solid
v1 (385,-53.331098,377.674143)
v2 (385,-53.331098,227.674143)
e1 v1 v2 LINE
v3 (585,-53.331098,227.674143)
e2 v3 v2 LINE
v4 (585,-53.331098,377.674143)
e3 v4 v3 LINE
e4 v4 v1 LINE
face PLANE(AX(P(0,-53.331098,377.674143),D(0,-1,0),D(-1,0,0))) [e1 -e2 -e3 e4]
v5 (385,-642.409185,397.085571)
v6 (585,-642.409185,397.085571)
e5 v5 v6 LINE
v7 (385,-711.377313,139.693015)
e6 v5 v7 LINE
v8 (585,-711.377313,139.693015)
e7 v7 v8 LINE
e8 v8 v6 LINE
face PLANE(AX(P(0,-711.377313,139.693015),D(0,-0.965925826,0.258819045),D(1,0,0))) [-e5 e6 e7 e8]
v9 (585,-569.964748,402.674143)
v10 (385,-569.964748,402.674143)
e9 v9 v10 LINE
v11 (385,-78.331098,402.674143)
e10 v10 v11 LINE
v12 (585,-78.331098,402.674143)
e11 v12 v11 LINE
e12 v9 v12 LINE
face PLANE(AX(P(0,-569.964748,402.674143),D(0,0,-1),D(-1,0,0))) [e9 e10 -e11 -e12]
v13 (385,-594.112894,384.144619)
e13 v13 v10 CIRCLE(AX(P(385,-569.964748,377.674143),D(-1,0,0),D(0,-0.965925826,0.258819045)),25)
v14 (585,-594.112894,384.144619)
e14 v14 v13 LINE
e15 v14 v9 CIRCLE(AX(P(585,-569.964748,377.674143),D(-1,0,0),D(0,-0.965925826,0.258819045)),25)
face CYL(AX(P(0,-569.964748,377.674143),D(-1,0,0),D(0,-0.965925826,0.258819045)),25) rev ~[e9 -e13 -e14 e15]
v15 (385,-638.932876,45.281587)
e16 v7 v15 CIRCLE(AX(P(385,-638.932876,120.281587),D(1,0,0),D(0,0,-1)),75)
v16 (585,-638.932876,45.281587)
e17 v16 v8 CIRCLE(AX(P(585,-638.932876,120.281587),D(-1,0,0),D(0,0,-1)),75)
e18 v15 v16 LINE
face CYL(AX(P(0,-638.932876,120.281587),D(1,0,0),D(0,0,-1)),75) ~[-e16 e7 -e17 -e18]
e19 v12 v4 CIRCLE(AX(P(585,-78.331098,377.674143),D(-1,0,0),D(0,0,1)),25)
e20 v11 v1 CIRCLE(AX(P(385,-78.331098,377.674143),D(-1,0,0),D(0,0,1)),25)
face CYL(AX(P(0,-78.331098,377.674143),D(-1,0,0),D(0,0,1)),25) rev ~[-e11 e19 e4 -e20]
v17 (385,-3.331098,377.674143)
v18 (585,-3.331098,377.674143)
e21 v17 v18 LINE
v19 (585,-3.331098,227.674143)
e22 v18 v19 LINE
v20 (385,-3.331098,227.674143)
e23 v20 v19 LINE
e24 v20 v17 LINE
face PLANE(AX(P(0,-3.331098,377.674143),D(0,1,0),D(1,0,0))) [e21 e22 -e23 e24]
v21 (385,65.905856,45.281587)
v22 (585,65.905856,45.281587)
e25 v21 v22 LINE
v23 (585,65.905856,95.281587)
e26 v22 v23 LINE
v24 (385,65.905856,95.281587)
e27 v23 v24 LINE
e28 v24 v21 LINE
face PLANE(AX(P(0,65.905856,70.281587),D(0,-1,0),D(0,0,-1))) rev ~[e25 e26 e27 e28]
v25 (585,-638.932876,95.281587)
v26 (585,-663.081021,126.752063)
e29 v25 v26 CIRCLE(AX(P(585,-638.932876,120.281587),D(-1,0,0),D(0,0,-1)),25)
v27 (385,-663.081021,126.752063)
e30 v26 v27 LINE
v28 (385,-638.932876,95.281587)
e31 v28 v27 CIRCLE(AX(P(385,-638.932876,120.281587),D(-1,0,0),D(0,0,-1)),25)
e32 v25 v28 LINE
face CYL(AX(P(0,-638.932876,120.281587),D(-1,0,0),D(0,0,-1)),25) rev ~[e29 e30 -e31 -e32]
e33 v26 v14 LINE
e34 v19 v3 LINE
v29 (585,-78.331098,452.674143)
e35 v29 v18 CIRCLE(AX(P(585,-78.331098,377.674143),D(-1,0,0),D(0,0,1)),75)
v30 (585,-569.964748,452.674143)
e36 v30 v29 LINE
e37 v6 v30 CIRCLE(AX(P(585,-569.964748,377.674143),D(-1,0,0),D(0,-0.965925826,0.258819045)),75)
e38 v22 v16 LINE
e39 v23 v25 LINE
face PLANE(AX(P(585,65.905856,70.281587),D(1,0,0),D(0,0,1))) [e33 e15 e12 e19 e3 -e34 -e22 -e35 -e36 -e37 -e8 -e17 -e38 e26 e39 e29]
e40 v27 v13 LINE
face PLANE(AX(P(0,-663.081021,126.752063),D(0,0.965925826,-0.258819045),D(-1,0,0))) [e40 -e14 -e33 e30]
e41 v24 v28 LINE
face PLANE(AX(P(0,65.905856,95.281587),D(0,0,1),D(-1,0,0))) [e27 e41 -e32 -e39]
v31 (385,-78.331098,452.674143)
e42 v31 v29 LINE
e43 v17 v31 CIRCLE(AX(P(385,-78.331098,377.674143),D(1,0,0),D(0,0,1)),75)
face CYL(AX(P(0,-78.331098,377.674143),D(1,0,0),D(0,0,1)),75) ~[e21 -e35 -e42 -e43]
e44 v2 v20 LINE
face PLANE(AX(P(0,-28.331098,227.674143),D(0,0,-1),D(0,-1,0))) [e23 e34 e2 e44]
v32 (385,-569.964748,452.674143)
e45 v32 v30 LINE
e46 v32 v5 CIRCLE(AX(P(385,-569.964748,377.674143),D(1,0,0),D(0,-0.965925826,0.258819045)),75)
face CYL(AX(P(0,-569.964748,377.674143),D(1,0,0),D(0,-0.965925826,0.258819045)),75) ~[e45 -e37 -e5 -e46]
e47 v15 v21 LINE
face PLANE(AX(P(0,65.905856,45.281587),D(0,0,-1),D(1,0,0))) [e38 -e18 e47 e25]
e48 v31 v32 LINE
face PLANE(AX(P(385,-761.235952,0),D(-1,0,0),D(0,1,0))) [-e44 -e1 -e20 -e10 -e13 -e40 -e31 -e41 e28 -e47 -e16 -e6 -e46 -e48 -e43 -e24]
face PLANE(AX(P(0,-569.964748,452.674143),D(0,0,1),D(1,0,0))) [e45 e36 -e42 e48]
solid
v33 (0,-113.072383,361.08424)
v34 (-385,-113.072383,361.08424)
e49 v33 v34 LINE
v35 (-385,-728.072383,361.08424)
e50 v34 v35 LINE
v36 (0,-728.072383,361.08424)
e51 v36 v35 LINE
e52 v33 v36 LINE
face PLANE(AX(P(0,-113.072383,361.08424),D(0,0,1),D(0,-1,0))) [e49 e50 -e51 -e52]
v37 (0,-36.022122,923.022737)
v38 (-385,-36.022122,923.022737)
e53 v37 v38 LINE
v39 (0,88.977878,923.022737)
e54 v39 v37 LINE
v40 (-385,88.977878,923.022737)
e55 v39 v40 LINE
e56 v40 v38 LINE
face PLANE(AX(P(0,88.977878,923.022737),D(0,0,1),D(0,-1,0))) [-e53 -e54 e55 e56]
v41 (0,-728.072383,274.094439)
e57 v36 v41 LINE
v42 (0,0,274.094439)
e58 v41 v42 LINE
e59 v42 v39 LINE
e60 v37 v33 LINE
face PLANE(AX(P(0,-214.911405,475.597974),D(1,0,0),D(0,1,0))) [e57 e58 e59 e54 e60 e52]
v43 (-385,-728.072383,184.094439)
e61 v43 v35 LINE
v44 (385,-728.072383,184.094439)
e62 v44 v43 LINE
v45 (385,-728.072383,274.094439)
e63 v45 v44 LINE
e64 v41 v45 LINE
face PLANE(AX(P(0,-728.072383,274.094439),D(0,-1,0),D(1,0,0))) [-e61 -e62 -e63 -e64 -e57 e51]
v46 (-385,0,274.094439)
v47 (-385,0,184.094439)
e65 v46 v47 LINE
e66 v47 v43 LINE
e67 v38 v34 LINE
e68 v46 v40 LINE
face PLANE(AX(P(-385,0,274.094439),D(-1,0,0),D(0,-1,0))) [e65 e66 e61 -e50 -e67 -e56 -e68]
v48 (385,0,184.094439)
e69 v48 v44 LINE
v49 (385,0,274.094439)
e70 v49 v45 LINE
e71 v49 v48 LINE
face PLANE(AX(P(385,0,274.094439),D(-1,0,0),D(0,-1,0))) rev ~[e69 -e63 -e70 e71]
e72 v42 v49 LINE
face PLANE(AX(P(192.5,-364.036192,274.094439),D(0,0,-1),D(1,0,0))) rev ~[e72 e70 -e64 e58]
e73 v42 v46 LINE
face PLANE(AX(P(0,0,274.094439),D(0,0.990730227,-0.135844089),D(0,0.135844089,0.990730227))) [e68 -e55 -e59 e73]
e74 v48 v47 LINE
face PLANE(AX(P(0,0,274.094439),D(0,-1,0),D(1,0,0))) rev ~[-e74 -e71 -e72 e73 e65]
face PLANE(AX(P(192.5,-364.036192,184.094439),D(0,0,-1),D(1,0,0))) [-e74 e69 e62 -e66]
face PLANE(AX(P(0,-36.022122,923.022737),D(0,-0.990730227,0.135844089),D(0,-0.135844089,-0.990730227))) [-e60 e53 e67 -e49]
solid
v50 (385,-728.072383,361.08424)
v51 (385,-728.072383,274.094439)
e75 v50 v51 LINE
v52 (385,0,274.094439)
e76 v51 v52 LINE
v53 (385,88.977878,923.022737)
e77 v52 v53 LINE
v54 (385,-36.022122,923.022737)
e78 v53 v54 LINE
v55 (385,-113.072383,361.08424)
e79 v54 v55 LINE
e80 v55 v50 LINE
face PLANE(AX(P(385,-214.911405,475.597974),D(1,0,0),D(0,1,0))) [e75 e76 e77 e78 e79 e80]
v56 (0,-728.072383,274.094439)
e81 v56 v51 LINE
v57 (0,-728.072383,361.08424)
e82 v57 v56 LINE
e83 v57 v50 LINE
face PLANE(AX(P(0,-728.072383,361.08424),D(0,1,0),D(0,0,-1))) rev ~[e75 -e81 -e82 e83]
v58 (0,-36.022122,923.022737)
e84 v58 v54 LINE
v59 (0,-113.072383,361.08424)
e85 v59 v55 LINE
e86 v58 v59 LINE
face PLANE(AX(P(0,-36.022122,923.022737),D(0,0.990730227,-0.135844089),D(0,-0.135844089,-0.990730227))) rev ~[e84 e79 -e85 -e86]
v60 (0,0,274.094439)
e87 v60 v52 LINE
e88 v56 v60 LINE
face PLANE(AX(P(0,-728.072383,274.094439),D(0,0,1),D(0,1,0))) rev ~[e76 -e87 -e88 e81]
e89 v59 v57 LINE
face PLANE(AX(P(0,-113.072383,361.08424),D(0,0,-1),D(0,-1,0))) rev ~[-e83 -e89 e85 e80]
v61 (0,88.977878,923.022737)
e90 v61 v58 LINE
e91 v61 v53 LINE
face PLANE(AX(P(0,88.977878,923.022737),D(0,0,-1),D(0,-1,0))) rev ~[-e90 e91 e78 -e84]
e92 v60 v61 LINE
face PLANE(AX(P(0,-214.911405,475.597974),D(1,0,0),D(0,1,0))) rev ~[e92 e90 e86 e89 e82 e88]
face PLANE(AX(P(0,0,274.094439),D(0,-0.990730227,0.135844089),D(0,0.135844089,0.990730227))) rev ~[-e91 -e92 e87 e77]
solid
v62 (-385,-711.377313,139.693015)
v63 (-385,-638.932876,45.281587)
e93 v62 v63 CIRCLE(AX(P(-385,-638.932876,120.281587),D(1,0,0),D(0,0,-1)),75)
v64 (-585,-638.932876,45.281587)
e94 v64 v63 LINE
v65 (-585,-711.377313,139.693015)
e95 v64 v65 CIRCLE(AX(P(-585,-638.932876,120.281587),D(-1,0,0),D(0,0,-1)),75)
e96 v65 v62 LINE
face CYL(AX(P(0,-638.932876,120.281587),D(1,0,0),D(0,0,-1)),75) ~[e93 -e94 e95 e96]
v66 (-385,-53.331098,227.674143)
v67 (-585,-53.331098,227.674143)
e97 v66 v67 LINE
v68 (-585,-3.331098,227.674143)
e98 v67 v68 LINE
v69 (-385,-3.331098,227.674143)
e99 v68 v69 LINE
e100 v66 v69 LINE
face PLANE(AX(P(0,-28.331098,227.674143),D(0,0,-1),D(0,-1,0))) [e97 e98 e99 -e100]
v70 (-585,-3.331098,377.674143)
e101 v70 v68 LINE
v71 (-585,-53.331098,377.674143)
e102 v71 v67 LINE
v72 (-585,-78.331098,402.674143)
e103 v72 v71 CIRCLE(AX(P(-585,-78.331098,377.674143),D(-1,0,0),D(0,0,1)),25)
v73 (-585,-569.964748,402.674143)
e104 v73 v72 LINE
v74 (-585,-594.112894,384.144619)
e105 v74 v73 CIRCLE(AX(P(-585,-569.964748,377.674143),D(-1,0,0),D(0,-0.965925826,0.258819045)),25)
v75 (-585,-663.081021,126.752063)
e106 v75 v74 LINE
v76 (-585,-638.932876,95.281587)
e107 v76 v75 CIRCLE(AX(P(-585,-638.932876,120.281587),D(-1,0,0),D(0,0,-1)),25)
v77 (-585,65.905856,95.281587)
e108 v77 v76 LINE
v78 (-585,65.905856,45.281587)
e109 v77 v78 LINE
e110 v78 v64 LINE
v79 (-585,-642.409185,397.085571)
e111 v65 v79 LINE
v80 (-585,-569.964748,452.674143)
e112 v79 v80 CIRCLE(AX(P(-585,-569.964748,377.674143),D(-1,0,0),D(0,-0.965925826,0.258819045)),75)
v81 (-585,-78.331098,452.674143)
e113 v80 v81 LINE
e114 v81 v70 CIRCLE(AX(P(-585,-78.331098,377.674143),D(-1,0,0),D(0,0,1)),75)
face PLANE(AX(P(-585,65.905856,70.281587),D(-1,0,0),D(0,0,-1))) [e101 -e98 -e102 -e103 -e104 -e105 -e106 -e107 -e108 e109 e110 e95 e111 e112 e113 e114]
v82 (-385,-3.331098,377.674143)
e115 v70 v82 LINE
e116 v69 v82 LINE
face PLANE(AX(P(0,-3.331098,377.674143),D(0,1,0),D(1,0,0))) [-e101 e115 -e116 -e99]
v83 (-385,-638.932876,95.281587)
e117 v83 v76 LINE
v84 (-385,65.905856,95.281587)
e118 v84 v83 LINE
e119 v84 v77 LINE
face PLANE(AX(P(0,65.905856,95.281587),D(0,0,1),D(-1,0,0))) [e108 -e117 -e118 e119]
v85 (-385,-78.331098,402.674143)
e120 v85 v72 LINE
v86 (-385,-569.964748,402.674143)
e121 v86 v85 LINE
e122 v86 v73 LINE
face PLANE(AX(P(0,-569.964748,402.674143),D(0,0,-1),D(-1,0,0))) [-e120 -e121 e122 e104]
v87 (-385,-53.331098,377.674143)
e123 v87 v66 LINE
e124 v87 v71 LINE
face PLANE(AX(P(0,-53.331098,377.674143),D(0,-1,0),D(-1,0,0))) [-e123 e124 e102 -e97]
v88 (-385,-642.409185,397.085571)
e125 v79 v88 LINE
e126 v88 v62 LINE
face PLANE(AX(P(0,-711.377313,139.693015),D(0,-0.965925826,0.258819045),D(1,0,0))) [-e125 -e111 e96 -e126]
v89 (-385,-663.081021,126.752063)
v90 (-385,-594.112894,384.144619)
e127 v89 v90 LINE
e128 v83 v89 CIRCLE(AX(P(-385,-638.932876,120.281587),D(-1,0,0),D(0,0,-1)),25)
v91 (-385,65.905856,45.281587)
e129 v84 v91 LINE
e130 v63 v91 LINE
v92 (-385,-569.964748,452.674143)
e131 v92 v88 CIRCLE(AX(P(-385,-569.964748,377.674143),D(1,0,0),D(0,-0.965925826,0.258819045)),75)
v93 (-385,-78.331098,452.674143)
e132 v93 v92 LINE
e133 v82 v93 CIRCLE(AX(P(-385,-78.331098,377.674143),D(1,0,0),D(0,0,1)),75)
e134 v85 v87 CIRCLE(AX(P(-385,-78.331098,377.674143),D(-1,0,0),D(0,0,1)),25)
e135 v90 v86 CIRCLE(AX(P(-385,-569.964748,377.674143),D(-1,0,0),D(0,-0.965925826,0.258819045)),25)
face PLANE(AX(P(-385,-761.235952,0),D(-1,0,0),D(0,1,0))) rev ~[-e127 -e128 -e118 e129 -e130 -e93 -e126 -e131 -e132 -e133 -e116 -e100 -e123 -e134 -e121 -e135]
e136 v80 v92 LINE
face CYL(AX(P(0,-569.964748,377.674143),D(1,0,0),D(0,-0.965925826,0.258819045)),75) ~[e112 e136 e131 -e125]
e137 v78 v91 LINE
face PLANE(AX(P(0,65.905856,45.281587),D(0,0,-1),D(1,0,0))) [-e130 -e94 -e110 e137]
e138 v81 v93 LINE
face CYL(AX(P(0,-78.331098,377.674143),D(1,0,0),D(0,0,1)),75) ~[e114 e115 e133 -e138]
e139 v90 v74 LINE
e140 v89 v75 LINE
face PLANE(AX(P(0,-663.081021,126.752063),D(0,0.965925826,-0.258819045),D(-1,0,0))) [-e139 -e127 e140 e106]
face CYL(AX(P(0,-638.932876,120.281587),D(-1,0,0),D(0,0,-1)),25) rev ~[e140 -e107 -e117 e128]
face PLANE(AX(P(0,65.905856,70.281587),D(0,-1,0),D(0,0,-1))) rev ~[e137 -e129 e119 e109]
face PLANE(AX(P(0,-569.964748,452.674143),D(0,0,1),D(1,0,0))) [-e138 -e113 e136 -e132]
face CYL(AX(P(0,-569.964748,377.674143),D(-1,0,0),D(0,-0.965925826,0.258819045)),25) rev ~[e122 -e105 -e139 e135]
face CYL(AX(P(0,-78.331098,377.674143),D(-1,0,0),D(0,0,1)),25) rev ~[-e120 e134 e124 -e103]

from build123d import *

# Parameters (mm, degrees)
F1_W       = 1170
F1_H       = 50
F3_W       = 770
F3_H       = 900
F4_DEPTH   = 600
F6_DEPTH   = 385
F7_DEPTH   = 385
F7_FACE_W  = 385
F7_FACE_H  = 728.0723833729
F7_FACE1_W = 385
F7_FACE1_H = 728.0723833729
F8_DEPTH   = 90


# Not quite as in the source:
# - an extrude ends at something that could not be found from the text; its depth is read off the source's solid


with BuildPart() as f2:
    # F2: sweep along a path in F0
    with BuildLine(Plane.YZ) as f2_path:
        Line((65.9058558057, 70.2815868228), (-638.9328755523, 70.2815868228))
        ThreePointArc((-638.9328755523, 70.2815868228), (-678.6005425668, 89.8435153723), (-687.2291668667, 133.2225390779))
        Line((-687.2291668667, 133.2225390779), (-618.2610394219, 390.6150948048))
        ThreePointArc((-618.2610394219, 390.6150948048), (-600.4028195579, 417.3418095643), (-569.9647481074, 427.6741425497))
        Line((-569.9647481074, 427.6741425497), (-78.3310975064, 427.6741425497))
        ThreePointArc((-78.3310975064, 427.6741425497), (-42.9757584471, 413.029481609), (-28.3310975064, 377.6741425497))
        Line((-28.3310975064, 377.6741425497), (-28.3310975064, 227.6741425497))
    # F1 (on Front) → F2 (sweep)
    with BuildSketch(Plane.XZ):
        with Locations((0, 70.2815868228)):
            Rectangle(F1_W, F1_H)
    sweep(path=f2_path.line)

    # F3 (on Top) → F4 (cut)
    with BuildSketch(Plane.XY):
        with Locations((0, -311.2359523773)):
            Rectangle(F3_W, F3_H)
    extrude(amount=F4_DEPTH, mode=Mode.SUBTRACT)


with BuildPart() as f6:
    # F5 (on Right) → F6 (new body, through all)
    with BuildSketch(Plane.YZ):
        Polygon((-728.0723833729, 361.0842398319), (-728.0723833729, 274.0944385529), (0, 274.0944385529), (88.9778784892, 923.0227374731), (-36.0221215108, 923.0227374731), (-113.0723833729, 361.0842398319), align=None)
    extrude(amount=F6_DEPTH)


with BuildPart() as f7:
    # F7 (new, through all): a face of the model
    f7_faces = [f6.part.faces().sort_by_distance(p)[0] for p in [
        (0, -420.5723833729, 350.6502613598),
    ]]
    extrude(f7_faces, amount=F7_DEPTH)

    # F7_face (on face) + F7_face1 (on face) → F8 (join)
    with BuildSketch(Plane(origin=(192.5, -364.0361916864, 274.0944385529), x_dir=(1, 0, 0), z_dir=(0, 0, -1))):
        Rectangle(F7_FACE_W, F7_FACE_H)
    with BuildSketch(Plane(origin=(-192.5, -364.0361916864, 274.0944385529), x_dir=(1, 0, 0), z_dir=(0, 0, -1))):
        Rectangle(F7_FACE1_W, F7_FACE1_H)
    extrude(amount=F8_DEPTH)


solid = Compound([f2.part, f6.part, f7.part])
